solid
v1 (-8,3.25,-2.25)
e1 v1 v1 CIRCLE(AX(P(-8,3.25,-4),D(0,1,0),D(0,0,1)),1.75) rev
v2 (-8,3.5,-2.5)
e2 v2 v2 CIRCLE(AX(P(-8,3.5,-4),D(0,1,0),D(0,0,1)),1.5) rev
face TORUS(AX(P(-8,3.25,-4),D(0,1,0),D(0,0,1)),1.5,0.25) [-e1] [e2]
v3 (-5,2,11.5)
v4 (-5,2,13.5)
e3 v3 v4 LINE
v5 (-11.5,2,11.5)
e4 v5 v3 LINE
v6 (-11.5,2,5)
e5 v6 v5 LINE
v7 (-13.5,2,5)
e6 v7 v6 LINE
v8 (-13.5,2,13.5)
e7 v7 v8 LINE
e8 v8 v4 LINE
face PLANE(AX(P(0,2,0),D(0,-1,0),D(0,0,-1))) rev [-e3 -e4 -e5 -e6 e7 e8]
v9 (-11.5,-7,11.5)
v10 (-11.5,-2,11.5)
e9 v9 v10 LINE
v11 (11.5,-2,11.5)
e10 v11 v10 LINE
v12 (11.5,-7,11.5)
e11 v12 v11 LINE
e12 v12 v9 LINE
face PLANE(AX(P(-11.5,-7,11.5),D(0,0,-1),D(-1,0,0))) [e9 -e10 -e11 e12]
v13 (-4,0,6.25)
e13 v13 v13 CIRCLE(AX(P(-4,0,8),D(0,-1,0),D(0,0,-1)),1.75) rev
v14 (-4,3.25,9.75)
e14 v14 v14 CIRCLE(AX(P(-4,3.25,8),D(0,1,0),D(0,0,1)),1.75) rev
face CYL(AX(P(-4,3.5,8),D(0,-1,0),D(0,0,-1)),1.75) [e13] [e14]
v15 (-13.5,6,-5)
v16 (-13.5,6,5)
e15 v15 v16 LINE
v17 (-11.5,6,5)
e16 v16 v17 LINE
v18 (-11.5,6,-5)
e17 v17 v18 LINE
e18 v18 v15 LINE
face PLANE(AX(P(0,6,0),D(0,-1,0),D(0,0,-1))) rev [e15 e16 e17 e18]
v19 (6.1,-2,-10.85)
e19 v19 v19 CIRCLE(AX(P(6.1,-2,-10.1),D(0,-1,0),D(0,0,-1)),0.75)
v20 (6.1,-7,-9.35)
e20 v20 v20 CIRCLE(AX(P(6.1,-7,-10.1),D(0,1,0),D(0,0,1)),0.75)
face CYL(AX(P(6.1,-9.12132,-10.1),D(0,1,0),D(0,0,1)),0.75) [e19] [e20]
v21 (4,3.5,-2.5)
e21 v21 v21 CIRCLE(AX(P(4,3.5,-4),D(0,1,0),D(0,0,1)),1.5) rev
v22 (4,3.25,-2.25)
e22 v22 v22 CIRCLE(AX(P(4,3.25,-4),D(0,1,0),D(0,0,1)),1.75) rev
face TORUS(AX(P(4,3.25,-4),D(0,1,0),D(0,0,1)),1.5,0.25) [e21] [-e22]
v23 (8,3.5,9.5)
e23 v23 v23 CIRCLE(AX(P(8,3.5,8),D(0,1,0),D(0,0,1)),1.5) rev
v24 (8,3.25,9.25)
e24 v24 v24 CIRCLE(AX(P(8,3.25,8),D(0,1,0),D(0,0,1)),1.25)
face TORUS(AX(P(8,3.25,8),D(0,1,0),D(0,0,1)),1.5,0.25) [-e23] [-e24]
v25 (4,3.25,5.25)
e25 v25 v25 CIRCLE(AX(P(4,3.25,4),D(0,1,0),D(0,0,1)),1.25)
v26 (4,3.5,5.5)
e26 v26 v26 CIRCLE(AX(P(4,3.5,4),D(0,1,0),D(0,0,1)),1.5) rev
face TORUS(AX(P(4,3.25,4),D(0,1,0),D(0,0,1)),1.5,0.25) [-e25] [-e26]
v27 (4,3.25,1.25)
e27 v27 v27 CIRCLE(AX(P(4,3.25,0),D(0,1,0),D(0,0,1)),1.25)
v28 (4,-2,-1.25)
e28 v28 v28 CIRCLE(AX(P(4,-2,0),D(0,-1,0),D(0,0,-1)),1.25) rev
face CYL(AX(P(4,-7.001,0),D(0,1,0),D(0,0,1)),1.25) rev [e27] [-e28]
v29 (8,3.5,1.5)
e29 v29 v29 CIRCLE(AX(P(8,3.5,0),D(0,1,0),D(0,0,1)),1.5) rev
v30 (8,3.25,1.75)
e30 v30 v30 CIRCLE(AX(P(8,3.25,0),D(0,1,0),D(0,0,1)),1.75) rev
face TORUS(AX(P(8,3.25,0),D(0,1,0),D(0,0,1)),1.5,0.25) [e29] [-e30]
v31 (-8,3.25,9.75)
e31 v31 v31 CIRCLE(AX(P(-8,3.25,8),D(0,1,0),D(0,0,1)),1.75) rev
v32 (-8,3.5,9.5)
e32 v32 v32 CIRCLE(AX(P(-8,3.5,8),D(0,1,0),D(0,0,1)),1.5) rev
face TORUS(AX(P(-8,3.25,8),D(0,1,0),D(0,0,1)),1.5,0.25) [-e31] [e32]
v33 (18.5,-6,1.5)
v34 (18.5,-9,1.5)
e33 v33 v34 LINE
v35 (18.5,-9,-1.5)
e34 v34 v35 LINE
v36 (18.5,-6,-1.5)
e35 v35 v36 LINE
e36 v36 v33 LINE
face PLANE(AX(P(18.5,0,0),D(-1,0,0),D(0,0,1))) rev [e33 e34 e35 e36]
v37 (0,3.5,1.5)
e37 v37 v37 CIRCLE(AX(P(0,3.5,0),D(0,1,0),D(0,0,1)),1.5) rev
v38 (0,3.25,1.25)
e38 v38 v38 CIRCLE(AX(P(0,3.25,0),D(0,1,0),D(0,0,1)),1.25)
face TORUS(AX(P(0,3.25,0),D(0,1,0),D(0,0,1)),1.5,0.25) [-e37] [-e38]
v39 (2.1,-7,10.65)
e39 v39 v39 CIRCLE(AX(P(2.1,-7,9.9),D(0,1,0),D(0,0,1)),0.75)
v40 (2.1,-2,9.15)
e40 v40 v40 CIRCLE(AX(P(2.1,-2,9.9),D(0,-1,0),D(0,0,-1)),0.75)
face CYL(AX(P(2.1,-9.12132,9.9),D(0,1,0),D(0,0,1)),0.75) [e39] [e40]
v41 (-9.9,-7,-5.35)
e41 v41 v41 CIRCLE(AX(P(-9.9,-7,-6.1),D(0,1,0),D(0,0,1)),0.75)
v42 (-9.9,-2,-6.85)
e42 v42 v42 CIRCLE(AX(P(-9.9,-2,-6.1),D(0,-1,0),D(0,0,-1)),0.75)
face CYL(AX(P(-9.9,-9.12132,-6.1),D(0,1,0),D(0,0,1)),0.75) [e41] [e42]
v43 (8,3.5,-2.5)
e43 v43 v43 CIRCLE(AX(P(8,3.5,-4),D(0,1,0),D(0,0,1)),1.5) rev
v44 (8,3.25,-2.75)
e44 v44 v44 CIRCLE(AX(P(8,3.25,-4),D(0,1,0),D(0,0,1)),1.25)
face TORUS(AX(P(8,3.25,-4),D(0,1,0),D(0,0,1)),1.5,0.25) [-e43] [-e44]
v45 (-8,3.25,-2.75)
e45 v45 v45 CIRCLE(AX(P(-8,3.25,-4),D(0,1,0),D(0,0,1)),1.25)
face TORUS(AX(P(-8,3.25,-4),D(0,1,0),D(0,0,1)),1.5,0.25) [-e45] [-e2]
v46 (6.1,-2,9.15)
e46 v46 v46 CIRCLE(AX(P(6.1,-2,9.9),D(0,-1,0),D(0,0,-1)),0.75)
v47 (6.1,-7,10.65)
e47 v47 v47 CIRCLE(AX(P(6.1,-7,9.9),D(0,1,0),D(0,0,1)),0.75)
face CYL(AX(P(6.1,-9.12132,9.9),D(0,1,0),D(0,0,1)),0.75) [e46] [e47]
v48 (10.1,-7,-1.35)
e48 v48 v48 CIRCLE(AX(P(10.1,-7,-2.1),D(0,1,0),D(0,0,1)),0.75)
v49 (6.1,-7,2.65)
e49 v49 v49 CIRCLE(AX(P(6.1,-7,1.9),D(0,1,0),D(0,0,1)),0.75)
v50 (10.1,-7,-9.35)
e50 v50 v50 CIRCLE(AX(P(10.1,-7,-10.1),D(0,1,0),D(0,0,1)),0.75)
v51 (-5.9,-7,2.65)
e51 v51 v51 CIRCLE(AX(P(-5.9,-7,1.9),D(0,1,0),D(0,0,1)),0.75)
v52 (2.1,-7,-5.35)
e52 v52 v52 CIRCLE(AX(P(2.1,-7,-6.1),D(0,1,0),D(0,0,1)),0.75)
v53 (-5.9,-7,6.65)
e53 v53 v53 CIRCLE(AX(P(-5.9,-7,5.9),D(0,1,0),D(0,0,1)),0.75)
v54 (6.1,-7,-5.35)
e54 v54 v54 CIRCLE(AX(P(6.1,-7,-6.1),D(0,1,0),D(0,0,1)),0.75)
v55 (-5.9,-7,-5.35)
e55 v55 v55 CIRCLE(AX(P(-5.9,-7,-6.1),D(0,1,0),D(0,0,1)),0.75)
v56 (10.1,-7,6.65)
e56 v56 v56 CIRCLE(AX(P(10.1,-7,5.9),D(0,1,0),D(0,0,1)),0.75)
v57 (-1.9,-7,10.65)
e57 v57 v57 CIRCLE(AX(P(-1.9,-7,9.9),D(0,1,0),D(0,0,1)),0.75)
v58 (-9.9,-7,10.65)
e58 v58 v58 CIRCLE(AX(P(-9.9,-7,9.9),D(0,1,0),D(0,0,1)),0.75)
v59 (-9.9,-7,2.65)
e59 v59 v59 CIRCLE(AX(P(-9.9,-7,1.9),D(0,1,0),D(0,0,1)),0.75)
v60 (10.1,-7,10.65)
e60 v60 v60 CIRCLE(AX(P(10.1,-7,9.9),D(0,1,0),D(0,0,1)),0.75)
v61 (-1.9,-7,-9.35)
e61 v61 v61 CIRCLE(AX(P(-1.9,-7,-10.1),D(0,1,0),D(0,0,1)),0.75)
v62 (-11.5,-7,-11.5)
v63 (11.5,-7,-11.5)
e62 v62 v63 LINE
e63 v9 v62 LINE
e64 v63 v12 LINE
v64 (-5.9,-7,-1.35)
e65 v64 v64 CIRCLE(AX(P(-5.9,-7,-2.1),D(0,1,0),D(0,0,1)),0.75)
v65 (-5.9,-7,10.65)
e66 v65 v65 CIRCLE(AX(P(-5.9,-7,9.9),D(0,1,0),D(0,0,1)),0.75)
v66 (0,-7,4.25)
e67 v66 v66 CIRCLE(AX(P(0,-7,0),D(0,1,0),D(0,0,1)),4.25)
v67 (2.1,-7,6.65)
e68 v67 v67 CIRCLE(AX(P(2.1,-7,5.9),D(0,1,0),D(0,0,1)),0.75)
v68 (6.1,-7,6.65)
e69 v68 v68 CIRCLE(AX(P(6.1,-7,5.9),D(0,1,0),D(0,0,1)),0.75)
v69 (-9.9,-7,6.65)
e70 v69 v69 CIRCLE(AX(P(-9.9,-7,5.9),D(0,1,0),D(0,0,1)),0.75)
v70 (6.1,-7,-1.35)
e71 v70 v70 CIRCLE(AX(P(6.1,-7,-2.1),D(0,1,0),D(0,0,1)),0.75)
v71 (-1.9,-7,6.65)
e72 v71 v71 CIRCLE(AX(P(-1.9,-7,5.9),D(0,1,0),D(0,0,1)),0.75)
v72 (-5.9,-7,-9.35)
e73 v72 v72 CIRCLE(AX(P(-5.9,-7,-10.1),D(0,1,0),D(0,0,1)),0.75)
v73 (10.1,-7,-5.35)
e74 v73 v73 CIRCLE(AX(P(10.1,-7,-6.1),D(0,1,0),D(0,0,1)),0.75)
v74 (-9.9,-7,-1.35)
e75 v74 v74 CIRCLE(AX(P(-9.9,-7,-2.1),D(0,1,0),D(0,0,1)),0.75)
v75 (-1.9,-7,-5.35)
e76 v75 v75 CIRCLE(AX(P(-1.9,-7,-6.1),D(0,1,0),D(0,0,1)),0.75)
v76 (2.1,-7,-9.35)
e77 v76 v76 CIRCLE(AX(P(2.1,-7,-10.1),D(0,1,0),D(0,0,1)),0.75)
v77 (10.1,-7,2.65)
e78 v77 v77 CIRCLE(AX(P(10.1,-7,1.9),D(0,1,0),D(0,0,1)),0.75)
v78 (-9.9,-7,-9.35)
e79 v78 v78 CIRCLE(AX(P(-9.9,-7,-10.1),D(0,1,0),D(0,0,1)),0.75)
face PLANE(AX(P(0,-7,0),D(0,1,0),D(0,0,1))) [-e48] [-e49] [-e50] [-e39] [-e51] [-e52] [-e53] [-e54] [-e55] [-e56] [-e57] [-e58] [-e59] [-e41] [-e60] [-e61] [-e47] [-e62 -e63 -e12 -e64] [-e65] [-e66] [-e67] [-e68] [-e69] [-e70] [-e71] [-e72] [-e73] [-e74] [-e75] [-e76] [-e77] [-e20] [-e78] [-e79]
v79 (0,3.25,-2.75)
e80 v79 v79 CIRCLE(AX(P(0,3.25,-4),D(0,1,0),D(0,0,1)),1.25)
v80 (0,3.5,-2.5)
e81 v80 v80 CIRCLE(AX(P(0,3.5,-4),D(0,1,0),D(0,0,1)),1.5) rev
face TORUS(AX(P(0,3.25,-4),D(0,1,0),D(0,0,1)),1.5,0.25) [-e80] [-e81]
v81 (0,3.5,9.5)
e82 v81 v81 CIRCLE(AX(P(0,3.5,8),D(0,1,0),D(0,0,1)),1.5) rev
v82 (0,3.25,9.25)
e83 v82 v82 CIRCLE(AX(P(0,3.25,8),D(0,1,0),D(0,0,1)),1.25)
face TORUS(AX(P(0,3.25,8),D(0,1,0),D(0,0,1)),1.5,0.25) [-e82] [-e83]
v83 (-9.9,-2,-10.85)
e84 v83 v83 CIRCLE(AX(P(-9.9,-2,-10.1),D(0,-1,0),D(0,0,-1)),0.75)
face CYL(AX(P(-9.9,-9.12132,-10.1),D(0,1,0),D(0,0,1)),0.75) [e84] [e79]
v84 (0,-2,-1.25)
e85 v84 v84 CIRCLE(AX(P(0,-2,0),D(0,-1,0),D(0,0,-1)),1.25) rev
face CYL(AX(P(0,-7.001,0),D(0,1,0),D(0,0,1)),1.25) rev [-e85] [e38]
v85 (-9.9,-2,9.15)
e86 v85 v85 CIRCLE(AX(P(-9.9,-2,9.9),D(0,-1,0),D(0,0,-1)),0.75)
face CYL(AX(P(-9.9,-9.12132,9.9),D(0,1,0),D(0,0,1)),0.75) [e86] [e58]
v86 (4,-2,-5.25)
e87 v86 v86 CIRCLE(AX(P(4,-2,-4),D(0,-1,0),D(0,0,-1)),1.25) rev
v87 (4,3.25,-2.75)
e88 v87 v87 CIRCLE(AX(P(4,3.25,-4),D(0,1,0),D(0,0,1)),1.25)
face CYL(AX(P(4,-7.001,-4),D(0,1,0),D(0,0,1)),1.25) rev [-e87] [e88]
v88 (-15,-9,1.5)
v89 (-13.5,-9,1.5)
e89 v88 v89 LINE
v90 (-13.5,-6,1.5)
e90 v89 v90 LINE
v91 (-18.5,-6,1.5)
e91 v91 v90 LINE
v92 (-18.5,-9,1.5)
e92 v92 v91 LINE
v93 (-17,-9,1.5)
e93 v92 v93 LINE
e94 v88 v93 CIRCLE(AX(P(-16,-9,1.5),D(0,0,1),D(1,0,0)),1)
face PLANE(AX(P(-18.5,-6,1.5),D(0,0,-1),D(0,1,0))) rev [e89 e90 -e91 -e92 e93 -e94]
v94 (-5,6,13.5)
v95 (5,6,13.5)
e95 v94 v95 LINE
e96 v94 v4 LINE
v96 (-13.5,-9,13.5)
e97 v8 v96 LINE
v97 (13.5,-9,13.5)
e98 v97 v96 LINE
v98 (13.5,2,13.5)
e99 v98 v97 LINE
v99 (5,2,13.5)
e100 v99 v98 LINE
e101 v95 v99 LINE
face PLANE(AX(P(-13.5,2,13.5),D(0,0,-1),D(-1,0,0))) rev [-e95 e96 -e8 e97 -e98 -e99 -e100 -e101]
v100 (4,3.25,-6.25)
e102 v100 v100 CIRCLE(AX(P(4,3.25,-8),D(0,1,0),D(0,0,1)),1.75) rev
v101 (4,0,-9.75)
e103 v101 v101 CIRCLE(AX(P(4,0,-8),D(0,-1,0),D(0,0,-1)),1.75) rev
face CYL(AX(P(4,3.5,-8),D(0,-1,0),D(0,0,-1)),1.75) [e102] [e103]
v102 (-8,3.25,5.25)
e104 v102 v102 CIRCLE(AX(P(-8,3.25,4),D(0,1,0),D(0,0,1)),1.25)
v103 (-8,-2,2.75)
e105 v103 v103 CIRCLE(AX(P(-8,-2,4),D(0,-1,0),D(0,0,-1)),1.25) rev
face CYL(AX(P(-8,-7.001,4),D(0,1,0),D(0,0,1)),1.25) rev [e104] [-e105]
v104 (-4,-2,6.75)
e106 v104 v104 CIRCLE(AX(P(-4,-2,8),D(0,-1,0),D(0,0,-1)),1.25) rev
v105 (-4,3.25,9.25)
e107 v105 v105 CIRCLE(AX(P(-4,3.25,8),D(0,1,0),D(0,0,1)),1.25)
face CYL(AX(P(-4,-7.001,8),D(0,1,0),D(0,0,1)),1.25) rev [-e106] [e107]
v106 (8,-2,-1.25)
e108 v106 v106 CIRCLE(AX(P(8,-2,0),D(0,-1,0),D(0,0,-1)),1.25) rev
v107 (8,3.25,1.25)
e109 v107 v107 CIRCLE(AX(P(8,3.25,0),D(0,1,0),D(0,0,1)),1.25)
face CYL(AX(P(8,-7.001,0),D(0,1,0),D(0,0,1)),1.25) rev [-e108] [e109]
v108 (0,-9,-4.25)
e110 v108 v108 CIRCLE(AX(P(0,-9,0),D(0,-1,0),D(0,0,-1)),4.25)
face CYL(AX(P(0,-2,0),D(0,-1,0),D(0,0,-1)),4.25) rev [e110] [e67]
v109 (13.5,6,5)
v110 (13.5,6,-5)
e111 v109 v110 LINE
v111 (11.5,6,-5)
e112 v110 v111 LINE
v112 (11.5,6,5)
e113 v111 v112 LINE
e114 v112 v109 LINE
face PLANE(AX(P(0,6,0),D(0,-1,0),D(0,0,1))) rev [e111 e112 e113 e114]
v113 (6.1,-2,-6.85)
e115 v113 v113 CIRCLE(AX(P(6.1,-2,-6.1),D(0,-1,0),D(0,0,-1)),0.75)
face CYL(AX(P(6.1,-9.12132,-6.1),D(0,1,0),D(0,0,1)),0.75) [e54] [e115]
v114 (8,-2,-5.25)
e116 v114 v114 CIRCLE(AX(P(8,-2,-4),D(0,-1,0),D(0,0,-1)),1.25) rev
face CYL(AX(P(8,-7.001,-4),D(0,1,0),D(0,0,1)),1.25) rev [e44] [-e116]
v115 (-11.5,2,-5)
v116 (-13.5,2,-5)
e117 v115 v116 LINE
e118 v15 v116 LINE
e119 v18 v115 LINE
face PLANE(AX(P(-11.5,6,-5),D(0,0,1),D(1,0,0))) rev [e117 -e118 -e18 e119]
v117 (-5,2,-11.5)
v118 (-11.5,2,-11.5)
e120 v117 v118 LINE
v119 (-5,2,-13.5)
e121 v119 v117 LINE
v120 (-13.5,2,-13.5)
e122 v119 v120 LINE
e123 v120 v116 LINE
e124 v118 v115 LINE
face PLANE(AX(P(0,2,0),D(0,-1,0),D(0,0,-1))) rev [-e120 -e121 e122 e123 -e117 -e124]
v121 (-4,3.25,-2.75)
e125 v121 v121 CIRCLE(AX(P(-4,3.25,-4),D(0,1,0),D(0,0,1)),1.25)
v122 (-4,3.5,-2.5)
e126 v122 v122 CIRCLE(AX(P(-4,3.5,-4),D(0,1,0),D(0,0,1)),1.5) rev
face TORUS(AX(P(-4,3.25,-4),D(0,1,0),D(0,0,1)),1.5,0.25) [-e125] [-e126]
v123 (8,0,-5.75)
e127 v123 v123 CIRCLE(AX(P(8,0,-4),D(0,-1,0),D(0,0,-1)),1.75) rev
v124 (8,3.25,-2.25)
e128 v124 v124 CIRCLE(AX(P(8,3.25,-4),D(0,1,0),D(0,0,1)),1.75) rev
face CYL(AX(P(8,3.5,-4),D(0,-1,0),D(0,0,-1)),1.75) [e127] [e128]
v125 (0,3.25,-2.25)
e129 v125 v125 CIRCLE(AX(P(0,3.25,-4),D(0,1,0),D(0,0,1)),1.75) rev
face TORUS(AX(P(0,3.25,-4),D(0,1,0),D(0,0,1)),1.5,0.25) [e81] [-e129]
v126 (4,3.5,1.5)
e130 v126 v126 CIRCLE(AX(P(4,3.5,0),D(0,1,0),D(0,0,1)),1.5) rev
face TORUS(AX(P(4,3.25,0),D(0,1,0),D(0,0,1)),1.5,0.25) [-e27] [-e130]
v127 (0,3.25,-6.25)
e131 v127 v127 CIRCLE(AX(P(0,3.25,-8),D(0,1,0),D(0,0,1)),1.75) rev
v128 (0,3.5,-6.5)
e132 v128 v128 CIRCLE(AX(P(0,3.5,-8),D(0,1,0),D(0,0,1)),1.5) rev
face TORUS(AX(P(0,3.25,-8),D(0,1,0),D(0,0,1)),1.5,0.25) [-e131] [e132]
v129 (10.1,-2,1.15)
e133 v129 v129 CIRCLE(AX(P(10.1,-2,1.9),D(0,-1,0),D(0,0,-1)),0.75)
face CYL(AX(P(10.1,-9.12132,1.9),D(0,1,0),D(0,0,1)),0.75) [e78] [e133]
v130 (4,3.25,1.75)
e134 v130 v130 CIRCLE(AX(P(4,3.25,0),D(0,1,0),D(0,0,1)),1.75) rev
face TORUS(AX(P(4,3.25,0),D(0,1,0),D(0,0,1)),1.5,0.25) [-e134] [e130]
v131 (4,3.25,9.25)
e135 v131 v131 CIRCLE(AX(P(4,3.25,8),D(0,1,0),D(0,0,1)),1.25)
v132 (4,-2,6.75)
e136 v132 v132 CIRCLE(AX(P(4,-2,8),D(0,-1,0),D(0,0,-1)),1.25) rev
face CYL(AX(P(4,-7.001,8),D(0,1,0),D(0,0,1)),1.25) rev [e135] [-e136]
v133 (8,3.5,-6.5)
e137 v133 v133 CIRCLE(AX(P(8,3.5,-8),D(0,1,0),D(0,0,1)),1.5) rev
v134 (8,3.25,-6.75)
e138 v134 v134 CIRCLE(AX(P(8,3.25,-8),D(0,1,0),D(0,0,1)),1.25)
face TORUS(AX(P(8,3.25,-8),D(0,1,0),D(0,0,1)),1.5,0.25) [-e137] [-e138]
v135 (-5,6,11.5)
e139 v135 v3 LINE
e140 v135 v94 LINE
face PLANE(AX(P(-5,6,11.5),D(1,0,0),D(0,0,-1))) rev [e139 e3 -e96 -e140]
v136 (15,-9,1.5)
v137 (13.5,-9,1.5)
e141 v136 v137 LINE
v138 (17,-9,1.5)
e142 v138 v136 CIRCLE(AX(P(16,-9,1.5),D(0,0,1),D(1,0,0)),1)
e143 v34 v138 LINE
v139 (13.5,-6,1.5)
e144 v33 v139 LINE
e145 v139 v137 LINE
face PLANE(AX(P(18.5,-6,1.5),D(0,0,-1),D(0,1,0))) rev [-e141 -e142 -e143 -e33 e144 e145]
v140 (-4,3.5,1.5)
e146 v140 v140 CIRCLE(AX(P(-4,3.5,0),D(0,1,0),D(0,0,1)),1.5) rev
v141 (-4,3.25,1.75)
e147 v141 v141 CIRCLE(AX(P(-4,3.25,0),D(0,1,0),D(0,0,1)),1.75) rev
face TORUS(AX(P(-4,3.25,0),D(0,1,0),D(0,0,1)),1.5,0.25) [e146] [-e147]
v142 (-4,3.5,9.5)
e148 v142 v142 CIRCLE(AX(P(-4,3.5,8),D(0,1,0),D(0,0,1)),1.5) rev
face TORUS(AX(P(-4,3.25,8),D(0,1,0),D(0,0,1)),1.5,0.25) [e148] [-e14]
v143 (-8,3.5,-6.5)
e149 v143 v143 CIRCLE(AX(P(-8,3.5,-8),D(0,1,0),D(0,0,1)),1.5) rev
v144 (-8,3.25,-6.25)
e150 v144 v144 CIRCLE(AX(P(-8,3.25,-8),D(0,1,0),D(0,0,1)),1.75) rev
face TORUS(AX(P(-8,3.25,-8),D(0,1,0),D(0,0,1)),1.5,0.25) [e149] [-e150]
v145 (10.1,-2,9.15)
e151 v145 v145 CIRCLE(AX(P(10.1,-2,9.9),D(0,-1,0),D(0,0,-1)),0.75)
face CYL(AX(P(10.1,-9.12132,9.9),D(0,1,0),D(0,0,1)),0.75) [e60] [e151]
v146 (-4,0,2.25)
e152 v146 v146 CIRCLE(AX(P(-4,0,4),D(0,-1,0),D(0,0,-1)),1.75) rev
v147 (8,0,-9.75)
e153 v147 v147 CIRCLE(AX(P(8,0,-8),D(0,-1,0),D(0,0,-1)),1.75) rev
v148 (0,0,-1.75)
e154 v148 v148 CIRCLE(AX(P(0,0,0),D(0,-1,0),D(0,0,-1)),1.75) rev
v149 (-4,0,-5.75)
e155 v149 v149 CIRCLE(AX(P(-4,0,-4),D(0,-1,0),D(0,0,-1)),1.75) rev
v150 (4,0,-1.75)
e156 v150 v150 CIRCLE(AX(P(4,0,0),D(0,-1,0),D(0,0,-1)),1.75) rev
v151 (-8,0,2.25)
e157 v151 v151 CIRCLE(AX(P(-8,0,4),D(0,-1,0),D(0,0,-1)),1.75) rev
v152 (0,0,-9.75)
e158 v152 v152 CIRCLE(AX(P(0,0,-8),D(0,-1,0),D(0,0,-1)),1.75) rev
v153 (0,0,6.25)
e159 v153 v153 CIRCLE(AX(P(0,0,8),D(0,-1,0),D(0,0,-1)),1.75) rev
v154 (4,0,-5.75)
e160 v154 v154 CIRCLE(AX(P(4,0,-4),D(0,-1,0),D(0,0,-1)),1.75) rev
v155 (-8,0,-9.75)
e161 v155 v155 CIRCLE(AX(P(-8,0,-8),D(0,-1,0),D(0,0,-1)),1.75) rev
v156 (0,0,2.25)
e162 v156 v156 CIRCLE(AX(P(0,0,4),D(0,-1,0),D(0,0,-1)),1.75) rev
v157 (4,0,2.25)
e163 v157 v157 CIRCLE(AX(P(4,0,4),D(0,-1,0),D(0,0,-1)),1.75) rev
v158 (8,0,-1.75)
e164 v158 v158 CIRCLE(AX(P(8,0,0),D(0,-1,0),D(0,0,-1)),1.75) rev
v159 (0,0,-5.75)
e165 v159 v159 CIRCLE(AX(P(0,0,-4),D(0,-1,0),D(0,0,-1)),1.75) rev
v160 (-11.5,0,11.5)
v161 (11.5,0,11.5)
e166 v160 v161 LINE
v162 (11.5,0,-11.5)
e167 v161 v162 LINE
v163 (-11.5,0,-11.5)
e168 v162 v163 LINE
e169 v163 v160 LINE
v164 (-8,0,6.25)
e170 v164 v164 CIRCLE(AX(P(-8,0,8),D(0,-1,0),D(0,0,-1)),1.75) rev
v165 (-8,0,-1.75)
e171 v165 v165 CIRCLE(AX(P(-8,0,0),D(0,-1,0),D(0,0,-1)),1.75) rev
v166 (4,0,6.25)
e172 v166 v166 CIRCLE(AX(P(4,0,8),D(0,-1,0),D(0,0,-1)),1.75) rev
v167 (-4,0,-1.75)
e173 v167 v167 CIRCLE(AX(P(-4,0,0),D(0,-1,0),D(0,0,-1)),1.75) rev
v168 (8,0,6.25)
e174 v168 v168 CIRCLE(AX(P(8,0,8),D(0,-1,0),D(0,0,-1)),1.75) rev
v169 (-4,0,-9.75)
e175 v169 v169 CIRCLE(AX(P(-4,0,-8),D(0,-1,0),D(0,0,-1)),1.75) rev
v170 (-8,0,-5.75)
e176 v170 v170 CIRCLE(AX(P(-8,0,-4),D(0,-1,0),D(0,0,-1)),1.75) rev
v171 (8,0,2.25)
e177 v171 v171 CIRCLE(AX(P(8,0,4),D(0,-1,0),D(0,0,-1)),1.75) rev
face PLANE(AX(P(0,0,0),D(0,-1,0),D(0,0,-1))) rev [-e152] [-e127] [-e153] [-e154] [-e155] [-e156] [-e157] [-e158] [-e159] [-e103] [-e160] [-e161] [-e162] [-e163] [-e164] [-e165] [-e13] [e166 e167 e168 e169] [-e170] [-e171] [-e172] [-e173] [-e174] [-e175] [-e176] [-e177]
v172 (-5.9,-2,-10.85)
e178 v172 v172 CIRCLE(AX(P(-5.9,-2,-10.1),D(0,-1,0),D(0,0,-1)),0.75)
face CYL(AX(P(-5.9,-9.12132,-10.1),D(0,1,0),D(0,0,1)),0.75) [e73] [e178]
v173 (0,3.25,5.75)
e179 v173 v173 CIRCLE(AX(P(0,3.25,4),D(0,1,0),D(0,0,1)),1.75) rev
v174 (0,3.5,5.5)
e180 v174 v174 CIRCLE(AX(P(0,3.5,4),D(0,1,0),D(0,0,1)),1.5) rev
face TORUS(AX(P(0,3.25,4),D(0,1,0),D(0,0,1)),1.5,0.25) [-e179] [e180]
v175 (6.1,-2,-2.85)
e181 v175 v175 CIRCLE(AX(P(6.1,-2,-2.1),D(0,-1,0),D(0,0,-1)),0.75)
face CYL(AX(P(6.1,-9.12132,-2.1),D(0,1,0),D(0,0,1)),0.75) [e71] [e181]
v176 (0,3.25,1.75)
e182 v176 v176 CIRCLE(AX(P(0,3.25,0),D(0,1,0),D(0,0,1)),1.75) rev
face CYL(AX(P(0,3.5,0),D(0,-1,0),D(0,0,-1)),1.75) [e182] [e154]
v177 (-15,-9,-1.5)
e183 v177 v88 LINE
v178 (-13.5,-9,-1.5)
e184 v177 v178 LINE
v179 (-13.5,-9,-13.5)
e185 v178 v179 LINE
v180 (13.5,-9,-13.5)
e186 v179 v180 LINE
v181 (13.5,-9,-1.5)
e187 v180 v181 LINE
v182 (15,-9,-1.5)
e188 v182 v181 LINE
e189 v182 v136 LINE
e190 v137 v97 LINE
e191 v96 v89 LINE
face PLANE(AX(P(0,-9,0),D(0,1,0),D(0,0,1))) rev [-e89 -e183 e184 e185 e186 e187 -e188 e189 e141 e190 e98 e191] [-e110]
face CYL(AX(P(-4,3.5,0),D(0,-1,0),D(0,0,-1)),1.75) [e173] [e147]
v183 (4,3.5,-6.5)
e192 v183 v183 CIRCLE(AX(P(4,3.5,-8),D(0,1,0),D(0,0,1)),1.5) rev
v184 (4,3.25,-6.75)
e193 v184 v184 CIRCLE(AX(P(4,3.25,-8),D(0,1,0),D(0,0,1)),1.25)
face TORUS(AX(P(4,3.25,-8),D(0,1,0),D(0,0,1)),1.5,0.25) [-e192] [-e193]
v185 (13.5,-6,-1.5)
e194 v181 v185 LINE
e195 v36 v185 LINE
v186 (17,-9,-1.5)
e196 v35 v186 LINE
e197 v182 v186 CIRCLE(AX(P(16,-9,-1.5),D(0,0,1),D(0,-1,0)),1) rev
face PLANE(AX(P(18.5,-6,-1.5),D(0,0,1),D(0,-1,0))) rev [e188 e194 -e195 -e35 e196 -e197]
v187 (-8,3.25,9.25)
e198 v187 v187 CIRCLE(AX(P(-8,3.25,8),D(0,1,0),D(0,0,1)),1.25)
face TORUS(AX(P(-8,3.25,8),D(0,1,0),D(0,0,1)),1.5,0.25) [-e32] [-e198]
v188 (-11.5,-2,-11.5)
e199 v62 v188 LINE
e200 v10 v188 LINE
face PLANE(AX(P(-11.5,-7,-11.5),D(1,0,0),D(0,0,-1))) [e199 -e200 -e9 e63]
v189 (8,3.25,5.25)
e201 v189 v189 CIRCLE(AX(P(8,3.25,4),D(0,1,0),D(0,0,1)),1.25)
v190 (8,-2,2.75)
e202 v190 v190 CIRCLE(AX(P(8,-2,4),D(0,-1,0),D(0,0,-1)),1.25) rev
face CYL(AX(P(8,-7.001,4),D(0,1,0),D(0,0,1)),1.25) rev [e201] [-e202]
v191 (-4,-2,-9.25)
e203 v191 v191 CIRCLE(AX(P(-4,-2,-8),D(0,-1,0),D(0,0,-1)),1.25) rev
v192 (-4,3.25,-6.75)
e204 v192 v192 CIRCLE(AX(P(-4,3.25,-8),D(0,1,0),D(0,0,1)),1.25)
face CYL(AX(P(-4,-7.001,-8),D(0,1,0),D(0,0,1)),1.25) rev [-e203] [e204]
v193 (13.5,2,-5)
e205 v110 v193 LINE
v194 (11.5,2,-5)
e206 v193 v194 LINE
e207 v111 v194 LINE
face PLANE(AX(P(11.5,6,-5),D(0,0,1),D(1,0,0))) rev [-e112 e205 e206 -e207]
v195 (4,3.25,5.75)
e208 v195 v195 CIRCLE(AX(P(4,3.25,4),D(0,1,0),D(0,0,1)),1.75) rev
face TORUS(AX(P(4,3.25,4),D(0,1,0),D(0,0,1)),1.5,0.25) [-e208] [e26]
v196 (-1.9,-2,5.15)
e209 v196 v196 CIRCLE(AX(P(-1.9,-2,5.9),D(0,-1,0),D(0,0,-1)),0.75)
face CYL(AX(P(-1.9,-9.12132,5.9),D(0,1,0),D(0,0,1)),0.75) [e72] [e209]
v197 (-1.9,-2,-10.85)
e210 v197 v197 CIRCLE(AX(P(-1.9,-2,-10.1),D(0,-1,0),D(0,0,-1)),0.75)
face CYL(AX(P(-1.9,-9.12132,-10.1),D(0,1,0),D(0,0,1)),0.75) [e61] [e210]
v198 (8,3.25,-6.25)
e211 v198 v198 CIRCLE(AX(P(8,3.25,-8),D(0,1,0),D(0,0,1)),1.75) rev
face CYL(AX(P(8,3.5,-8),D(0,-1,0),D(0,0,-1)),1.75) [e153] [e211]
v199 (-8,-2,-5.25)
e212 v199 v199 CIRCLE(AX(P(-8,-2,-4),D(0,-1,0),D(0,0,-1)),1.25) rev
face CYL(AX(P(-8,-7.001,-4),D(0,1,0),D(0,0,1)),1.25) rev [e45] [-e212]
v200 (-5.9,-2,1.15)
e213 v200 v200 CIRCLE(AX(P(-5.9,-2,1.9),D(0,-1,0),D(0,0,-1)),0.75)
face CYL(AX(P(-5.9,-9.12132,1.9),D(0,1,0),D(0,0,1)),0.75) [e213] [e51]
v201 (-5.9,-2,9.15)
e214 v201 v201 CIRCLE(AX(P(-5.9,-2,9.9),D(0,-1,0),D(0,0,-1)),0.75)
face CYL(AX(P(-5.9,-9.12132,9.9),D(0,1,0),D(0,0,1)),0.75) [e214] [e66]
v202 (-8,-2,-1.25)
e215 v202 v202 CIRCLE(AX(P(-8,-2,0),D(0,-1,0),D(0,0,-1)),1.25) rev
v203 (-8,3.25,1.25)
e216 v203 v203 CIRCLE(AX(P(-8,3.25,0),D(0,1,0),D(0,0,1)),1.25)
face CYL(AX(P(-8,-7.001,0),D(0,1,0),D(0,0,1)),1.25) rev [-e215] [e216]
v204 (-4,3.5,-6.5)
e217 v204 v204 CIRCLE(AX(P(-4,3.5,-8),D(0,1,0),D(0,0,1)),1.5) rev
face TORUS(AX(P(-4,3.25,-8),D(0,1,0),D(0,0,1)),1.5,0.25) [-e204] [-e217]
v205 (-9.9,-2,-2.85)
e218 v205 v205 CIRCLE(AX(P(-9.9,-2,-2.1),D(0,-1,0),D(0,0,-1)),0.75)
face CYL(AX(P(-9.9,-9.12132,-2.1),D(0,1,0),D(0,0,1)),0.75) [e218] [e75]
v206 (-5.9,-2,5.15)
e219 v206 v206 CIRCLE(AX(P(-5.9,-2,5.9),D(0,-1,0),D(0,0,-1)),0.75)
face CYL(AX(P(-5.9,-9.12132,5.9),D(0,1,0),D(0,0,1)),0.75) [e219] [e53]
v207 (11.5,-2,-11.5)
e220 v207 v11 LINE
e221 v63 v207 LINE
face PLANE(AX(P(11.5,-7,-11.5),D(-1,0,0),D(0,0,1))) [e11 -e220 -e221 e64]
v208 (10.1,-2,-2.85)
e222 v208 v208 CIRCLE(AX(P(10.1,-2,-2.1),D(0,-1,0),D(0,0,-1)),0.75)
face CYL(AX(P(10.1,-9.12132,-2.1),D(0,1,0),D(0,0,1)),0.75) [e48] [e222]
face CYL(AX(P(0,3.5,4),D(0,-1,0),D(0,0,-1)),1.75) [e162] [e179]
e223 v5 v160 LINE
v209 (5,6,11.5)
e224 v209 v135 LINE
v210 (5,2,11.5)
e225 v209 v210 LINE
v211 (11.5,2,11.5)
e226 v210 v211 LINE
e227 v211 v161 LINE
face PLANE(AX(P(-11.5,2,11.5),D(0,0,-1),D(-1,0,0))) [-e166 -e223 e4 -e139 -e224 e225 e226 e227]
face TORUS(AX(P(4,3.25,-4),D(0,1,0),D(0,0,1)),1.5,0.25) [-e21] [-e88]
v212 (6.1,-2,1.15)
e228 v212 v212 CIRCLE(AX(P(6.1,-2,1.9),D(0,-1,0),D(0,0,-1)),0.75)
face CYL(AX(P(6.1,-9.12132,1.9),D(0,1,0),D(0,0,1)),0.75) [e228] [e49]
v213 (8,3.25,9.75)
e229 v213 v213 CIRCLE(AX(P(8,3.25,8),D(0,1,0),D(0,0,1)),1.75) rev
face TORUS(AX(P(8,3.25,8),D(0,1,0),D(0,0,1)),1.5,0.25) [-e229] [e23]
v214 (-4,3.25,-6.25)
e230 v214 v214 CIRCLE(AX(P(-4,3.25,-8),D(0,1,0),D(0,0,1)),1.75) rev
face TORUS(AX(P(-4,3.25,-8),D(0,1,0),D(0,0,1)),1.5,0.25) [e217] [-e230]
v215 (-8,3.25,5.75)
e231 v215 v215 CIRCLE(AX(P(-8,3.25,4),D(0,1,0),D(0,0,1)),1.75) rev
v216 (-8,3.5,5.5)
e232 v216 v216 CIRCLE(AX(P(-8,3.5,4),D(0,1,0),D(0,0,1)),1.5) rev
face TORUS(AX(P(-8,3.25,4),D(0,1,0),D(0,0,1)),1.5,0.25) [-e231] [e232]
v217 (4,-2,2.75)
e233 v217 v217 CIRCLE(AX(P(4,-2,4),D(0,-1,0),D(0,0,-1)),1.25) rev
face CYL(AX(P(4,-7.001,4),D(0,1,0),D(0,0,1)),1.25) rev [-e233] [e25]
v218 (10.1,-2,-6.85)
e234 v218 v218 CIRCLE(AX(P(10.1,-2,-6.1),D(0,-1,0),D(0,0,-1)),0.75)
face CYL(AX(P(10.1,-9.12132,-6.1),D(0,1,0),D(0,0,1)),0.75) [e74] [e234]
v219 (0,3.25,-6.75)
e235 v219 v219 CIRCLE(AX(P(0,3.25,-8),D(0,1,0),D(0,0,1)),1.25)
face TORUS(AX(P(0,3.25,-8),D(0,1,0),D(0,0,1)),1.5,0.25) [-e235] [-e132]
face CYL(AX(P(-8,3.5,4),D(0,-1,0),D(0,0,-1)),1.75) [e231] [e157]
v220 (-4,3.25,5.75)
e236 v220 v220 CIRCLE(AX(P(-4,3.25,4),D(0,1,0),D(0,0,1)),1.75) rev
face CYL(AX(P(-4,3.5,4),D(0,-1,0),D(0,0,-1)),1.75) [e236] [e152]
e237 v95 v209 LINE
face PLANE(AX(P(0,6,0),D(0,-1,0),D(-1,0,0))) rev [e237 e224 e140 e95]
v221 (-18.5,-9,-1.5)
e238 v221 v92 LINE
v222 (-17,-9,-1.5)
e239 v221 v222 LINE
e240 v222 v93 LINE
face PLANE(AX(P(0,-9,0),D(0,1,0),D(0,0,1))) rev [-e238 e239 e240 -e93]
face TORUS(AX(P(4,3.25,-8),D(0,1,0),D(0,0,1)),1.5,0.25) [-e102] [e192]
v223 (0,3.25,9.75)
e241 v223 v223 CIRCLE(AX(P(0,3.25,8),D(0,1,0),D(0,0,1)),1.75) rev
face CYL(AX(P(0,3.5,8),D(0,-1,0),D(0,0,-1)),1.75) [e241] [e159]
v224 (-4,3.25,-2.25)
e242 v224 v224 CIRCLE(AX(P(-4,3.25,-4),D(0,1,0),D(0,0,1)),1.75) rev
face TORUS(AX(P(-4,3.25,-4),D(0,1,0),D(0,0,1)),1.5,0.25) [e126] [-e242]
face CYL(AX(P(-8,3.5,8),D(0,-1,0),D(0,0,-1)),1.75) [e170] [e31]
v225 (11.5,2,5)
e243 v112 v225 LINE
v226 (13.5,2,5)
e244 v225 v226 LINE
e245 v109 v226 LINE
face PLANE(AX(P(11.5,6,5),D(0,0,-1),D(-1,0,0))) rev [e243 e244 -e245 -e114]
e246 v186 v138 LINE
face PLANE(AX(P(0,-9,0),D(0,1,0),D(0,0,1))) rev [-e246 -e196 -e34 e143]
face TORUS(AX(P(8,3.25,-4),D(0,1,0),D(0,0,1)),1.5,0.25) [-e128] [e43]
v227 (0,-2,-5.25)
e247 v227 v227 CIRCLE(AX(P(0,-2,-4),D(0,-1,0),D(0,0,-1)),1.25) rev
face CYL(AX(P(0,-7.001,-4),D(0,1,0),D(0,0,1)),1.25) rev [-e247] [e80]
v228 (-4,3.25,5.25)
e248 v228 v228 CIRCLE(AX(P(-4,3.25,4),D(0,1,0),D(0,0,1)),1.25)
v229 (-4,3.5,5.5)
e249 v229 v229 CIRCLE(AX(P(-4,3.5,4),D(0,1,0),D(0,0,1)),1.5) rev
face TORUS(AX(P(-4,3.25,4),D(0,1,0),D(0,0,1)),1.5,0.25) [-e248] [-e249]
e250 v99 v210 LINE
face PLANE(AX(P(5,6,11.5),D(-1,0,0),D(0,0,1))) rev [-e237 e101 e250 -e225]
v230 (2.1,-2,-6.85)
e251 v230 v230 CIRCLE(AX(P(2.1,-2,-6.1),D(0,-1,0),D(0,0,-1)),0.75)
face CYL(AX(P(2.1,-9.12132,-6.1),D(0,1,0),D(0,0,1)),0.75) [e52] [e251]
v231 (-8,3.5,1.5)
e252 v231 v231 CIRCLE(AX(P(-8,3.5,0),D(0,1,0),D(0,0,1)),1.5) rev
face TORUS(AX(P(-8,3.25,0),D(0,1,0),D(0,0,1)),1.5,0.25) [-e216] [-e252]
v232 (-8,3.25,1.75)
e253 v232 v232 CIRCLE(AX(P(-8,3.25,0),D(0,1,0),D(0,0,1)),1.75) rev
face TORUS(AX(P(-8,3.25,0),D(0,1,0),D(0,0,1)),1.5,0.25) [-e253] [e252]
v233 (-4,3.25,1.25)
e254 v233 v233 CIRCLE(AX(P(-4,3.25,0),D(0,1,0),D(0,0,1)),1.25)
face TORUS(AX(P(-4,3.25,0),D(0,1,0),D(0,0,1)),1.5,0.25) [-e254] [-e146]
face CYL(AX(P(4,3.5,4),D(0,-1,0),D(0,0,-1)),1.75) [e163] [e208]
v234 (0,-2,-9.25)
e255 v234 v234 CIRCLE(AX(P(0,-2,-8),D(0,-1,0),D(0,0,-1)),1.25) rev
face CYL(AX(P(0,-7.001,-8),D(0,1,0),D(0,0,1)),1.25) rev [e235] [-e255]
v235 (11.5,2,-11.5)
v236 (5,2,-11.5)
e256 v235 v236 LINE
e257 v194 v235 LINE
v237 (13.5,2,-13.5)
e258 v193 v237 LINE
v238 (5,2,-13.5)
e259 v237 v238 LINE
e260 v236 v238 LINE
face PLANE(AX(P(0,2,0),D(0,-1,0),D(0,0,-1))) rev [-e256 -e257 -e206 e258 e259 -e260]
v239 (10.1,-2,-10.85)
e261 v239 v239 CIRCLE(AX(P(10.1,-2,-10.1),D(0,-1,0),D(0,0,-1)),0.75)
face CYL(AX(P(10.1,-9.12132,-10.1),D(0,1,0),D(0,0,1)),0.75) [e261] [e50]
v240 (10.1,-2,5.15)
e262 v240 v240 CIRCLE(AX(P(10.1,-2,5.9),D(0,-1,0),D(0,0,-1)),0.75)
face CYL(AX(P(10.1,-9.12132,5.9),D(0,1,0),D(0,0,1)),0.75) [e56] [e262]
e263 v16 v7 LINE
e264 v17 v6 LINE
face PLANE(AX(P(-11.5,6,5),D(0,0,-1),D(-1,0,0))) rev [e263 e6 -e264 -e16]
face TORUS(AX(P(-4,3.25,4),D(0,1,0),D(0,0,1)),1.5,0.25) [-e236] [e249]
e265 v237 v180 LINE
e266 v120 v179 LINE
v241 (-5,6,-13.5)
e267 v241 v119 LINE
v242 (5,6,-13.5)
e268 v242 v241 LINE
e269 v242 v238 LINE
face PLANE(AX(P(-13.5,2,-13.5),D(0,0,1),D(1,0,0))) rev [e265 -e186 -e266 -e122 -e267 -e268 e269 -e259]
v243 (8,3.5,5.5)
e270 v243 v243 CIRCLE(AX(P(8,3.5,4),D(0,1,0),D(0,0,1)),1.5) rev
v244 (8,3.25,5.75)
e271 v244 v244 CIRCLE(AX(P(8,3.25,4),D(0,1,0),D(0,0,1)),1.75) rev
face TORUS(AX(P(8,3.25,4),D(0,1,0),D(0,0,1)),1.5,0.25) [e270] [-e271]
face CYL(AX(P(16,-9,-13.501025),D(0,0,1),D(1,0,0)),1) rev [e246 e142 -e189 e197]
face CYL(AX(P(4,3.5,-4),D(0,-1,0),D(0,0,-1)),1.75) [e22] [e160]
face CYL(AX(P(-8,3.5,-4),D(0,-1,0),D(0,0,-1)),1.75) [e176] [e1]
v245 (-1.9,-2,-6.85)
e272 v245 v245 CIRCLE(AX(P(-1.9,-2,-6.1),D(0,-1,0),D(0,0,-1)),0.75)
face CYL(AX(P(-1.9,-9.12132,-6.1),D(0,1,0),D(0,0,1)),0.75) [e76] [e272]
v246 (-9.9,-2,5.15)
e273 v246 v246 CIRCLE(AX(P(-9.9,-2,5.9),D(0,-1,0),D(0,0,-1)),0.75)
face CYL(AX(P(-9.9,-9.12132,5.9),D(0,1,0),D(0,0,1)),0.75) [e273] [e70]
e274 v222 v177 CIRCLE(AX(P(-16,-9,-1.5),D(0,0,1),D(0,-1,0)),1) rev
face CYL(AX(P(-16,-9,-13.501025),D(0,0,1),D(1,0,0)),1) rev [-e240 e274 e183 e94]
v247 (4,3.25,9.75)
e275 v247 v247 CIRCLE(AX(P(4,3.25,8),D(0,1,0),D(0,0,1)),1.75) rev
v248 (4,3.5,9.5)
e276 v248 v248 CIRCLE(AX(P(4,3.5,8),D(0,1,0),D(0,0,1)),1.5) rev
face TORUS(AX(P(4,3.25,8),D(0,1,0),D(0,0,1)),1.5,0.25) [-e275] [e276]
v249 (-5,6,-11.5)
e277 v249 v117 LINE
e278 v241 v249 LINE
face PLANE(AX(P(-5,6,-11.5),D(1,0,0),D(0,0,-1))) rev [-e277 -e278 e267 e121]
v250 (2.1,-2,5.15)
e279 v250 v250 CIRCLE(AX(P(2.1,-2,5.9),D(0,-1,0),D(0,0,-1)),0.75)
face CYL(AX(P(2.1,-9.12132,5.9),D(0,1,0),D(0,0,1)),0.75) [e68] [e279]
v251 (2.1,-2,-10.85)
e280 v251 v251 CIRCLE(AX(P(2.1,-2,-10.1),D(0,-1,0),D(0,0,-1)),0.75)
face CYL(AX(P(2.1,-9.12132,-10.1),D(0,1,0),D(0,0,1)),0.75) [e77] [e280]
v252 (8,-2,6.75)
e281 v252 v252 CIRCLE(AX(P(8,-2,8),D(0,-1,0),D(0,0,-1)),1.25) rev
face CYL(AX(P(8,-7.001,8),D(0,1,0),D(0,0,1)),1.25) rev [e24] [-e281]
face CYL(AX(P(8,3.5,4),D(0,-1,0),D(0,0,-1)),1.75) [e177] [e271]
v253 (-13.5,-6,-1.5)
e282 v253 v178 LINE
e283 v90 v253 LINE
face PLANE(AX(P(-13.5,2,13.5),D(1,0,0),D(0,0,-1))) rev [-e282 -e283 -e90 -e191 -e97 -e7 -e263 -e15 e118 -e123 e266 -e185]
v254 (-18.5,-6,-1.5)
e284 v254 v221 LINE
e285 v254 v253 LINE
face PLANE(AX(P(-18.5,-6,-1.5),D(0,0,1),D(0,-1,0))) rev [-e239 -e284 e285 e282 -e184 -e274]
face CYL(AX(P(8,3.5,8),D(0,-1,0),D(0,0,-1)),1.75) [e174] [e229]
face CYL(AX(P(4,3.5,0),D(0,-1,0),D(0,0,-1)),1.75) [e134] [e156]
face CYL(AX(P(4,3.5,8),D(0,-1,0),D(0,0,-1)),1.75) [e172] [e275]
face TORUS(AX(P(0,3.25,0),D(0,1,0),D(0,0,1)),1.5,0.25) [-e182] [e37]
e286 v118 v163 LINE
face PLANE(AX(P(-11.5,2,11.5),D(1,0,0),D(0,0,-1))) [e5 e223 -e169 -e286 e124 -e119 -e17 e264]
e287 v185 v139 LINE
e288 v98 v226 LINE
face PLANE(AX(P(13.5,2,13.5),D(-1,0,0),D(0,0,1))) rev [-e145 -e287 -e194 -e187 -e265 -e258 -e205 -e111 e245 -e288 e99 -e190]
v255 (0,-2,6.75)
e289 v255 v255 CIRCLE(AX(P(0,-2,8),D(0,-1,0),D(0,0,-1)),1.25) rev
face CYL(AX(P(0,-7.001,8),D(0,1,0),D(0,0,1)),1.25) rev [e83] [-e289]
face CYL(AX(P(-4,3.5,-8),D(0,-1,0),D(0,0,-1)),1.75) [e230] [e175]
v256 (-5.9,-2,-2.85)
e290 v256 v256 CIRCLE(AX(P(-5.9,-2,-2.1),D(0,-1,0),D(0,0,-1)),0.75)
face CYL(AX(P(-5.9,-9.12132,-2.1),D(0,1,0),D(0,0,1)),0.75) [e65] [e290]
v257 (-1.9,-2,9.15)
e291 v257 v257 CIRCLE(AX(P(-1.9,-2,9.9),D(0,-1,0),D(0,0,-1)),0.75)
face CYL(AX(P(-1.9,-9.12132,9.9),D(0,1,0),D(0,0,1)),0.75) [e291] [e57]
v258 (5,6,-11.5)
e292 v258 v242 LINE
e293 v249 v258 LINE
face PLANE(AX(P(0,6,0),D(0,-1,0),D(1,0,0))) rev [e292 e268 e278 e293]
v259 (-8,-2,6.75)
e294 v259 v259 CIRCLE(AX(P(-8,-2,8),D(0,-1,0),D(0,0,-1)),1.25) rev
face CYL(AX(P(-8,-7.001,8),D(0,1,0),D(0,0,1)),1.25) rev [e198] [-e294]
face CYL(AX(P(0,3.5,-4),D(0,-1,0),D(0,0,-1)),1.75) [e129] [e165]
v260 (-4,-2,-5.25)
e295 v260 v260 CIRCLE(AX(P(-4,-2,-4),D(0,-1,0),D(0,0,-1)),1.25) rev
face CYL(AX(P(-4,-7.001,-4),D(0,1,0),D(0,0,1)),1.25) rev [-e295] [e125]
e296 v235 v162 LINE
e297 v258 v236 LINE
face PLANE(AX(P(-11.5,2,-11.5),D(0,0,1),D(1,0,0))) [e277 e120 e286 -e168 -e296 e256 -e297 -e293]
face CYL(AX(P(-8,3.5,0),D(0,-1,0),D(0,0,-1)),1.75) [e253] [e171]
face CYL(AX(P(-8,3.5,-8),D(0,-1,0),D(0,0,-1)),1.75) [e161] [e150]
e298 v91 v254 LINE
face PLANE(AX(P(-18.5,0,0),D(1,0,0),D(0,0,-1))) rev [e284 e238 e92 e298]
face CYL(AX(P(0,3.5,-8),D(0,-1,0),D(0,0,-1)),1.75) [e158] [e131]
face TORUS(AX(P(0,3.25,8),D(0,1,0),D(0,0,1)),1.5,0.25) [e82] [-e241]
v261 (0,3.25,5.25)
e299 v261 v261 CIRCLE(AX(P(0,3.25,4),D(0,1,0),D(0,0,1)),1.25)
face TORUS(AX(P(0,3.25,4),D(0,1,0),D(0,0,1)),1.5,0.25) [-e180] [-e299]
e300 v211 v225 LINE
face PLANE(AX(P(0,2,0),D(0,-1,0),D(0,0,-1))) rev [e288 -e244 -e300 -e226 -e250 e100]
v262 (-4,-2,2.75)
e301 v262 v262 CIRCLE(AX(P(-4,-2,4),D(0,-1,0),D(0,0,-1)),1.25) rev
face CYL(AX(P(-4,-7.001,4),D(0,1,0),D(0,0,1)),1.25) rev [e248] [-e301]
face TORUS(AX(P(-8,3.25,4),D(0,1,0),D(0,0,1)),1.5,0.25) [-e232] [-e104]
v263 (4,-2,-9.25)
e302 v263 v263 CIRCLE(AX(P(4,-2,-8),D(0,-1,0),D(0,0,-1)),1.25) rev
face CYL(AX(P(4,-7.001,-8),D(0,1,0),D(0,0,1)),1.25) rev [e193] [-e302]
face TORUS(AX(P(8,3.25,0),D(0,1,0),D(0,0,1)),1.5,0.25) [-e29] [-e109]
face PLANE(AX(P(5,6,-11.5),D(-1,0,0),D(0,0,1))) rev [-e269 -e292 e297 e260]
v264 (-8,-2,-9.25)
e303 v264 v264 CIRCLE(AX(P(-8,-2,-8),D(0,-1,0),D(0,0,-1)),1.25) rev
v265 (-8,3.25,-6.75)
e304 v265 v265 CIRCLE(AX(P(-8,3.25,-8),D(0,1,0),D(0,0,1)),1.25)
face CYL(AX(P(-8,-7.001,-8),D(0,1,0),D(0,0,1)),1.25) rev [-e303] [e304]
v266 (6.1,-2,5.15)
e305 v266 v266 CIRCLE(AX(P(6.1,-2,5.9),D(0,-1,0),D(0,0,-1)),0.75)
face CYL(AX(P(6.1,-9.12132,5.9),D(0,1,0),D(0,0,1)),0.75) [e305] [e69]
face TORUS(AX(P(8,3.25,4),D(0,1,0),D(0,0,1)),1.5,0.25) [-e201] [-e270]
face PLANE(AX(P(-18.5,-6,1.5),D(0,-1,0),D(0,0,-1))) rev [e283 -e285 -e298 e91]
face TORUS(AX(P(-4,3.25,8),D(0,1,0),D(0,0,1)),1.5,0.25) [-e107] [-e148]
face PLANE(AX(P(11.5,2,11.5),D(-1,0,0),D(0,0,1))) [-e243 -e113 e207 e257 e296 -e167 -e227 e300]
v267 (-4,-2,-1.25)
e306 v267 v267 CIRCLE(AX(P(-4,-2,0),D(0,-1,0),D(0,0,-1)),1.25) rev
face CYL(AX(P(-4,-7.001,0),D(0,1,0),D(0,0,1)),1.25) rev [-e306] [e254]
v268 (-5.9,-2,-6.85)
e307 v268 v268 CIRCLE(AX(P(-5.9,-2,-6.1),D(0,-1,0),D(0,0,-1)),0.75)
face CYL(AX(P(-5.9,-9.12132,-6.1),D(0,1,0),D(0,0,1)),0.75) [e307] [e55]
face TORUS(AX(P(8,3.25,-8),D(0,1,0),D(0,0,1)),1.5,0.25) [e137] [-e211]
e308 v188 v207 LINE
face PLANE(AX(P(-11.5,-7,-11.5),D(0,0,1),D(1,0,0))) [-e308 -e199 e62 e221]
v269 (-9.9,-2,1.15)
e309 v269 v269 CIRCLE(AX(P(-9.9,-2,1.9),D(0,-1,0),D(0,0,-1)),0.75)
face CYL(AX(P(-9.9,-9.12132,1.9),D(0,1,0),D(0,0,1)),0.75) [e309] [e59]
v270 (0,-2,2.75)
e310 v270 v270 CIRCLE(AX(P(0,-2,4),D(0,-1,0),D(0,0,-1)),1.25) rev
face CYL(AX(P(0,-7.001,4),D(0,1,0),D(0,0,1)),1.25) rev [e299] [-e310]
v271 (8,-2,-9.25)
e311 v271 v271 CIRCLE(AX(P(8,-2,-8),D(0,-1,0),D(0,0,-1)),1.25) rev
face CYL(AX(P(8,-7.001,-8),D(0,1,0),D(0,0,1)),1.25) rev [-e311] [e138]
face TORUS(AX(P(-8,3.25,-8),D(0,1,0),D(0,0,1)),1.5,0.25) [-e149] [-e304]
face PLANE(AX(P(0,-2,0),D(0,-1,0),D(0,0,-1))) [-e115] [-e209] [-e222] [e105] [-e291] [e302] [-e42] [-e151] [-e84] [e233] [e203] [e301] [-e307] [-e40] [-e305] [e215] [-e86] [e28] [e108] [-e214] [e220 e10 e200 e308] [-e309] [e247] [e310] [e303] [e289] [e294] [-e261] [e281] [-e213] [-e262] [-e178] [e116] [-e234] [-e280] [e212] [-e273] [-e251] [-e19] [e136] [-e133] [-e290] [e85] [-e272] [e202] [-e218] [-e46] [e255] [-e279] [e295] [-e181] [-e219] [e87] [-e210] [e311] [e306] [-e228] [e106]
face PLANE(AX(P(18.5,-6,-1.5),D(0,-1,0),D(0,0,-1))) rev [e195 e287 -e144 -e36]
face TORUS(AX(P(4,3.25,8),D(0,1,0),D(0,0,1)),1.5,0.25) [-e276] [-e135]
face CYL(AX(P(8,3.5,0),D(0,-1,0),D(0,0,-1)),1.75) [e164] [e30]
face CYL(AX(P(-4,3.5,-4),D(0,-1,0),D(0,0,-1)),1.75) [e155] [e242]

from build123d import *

# Parameters (mm, degrees)
SKETCH1_W              = 27
SKETCH1_H              = 27
SKETCH1_W_2            = 23
SKETCH1_H_2            = 23
BOSS_EXTRUDE1_DEPTH    = 2
SKETCH2_W              = 27
SKETCH2_H              = 27
BOSS_EXTRUDE2_DEPTH    = 2
SKETCH3_W              = 27
SKETCH3_H              = 27
SKETCH3_W_2            = 23
SKETCH3_H_2            = 23
BOSS_EXTRUDE3_DEPTH    = 5
SKETCH6_R              = 1.75
BOSS_EXTRUDE5_DEPTH    = 3.5
CUT_EXTRUDE2_REACH     = 23.789
SKETCH7_R              = 1.25
FILLET1_R              = 0.25
LPATTERN3_COUNT        = 5
LPATTERN3_PITCH        = 4
LPATTERN3_COUNT_DIR2   = 5
LPATTERN3_PITCH_DIR2   = 4
FILLET1_OF_LPATTERN3_R = 0.25
SKETCH11_R             = 0.75
BOSS_EXTRUDE8_DEPTH    = 5
LPATTERN2_COUNT        = 6
LPATTERN2_PITCH        = 4
LPATTERN2_COUNT_DIR2   = 6
LPATTERN2_PITCH_DIR2   = 4
SKETCH8_W              = 27
SKETCH8_H              = 27
BOSS_EXTRUDE6_DEPTH    = 2
SKETCH9_R              = 4.25
CUT_EXTRUDE3_DEPTH     = 7
SKETCH10_W             = 2
SKETCH10_H             = 10
BOSS_EXTRUDE7_DEPTH    = 4
CIRPATTERN2_COUNT      = 4
SKETCH12_W             = 3
SKETCH12_H             = 3
BOSS_EXTRUDE9_DEPTH    = 5
CIRPATTERN1_COUNT      = 2
CUT_EXTRUDE4_REACH     = 27.461


with BuildPart() as part:
    # Sketch1 → Boss-Extrude1 (new body)
    with BuildSketch(Plane(origin=(0, 0, 0), x_dir=(1, 0, 0), z_dir=(0, 1, 0))):
        Rectangle(SKETCH1_W, SKETCH1_H)
        Rectangle(SKETCH1_W_2, SKETCH1_H_2, mode=Mode.SUBTRACT)
    extrude(amount=BOSS_EXTRUDE1_DEPTH)

    # Sketch2 → Boss-Extrude2 (add)
    with BuildSketch(Plane.XZ):
        Rectangle(SKETCH2_W, SKETCH2_H)
    extrude(amount=BOSS_EXTRUDE2_DEPTH)

    # Sketch3 → Boss-Extrude3 (add)
    with BuildSketch(Plane.XZ.offset(2)):
        Rectangle(SKETCH3_W, SKETCH3_H)
        Rectangle(SKETCH3_W_2, SKETCH3_H_2, mode=Mode.SUBTRACT)
    extrude(amount=BOSS_EXTRUDE3_DEPTH)

    # Sketch6 → Boss-Extrude5 (add)
    with BuildSketch(Plane(origin=(0, 0, 0), x_dir=(1, 0, 0), z_dir=(0, 1, 0))):
        with Locations(Location((8, 8, 0), (0, 0, 90))):
            Circle(SKETCH6_R)
    boss_extrude5 = extrude(amount=BOSS_EXTRUDE5_DEPTH)

    # Sketch7 → Cut-Extrude2 (cut, up to next)
    with BuildSketch(Plane(origin=(0, 3.5, 0), x_dir=(1, 0, 0), z_dir=(0, 1, 0)), mode=Mode.PRIVATE) as cut_extrude2_sk1:
        with Locations(Location((8, 8, 0), (0, 0, 270))):
            Circle(SKETCH7_R)
    cut_extrude2_tool1 = extrude(cut_extrude2_sk1.sketch, amount=-CUT_EXTRUDE2_REACH, mode=Mode.PRIVATE) & part.part
    cut_extrude2 = cut_extrude2_tool1.solids().sort_by_distance((8, 3.5, -8))[0]
    add(cut_extrude2, mode=Mode.SUBTRACT)

    # Fillet1
    fillet1_edges = [part.edges().sort_by_distance(p)[0] for p in [
        (8, 3.5, -6.25),
        (8, 3.5, -9.25),
    ]]
    fillet(fillet1_edges, radius=FILLET1_R - 0.0001)  # a hair under: the kernel refuses the full size

    # LPattern3: Boss-Extrude5, Cut-Extrude2 5 × 5
    with Locations(*[(-j * LPATTERN3_PITCH_DIR2, 0, i * LPATTERN3_PITCH) for i in range(LPATTERN3_COUNT) for j in range(LPATTERN3_COUNT_DIR2) if (i, j) != (0, 0)]):
        add(boss_extrude5)
        add(cut_extrude2, mode=Mode.SUBTRACT)

    # Fillet1 of LPattern3
    fillet1_of_lpattern3_edges = [part.edges().sort_by_distance(p)[0] for p in [
        (4, 3.5, -6.25),
        (4, 3.5, -9.25),
        (0, 3.5, -6.25),
        (0, 3.5, -9.25),
        (-4, 3.5, -6.25),
        (-4, 3.5, -9.25),
        (-8, 3.5, -6.25),
        (-8, 3.5, -9.25),
        (8, 3.5, -2.25),
        (8, 3.5, -5.25),
        (4, 3.5, -2.25),
        (4, 3.5, -5.25),
        (0, 3.5, -2.25),
        (0, 3.5, -5.25),
        (-4, 3.5, -2.25),
        (-4, 3.5, -5.25),
        (-8, 3.5, -2.25),
        (-8, 3.5, -5.25),
        (8, 3.5, 1.75),
        (8, 3.5, -1.25),
        (4, 3.5, 1.75),
        (4, 3.5, -1.25),
        (0, 3.5, 1.75),
        (0, 3.5, -1.25),
        (-4, 3.5, 1.75),
        (-4, 3.5, -1.25),
        (-8, 3.5, 1.75),
        (-8, 3.5, -1.25),
        (8, 3.5, 5.75),
        (8, 3.5, 2.75),
        (4, 3.5, 5.75),
        (4, 3.5, 2.75),
        (0, 3.5, 5.75),
        (0, 3.5, 2.75),
        (-4, 3.5, 5.75),
        (-4, 3.5, 2.75),
        (-8, 3.5, 5.75),
        (-8, 3.5, 2.75),
        (8, 3.5, 9.75),
        (8, 3.5, 6.75),
        (4, 3.5, 9.75),
        (4, 3.5, 6.75),
        (0, 3.5, 9.75),
        (0, 3.5, 6.75),
        (-4, 3.5, 9.75),
        (-4, 3.5, 6.75),
        (-8, 3.5, 9.75),
        (-8, 3.5, 6.75),
    ]]
    fillet(fillet1_of_lpattern3_edges, radius=FILLET1_OF_LPATTERN3_R - 0.0001)  # a hair under: the kernel refuses the full size

    # Sketch11 → Boss-Extrude8 (add)
    with BuildSketch(Plane.XZ.offset(2)):
        with Locations(Location((-9.9, 9.9, 0), (0, 0, 90))):
            Circle(SKETCH11_R)
    boss_extrude8 = extrude(amount=BOSS_EXTRUDE8_DEPTH)

    # LPattern2: Boss-Extrude8 6 × 6
    with Locations(*[(i * LPATTERN2_PITCH, 0, -j * LPATTERN2_PITCH_DIR2) for i in range(LPATTERN2_COUNT) for j in range(LPATTERN2_COUNT_DIR2) if (i, j) != (0, 0)]):
        add(boss_extrude8)

    # Sketch8 → Boss-Extrude6 (add)
    with BuildSketch(Plane.XZ.offset(7)):
        Rectangle(SKETCH8_W, SKETCH8_H)
    extrude(amount=BOSS_EXTRUDE6_DEPTH)

    # Sketch9 → Cut-Extrude3 (cut)
    with BuildSketch(Plane.XZ.offset(9)):
        with Locations(Location((0, 0, 0), (0, 0, 270))):
            Circle(SKETCH9_R)
    extrude(amount=-CUT_EXTRUDE3_DEPTH, mode=Mode.SUBTRACT)

    # Sketch10 → Boss-Extrude7 (add)
    with BuildSketch(Plane(origin=(0, 2, 0), x_dir=(1, 0, 0), z_dir=(0, 1, 0))):
        with Locations((-12.5, 0)):
            Rectangle(SKETCH10_W, SKETCH10_H)
    boss_extrude7 = extrude(amount=BOSS_EXTRUDE7_DEPTH)

    # CirPattern2: Boss-Extrude7 ×4 about axis
    cirpattern2_axis = Axis((0, 0, 0), (0, 1, 0))
    for i in range(1, CIRPATTERN2_COUNT):
        add(boss_extrude7.rotate(cirpattern2_axis, i * 360 / CIRPATTERN2_COUNT))

    # Sketch12 → Boss-Extrude9 (add)
    with BuildSketch(Plane.ZY.offset(13.5)):
        with Locations((0, -7.5)):
            Rectangle(SKETCH12_W, SKETCH12_H)
    boss_extrude9 = extrude(amount=BOSS_EXTRUDE9_DEPTH)

    # CirPattern1: Boss-Extrude9 ×2 about axis
    cirpattern1_axis = Axis((0, 0, 0), (0, 1, 0))
    for i in range(1, CIRPATTERN1_COUNT):
        add(boss_extrude9.rotate(cirpattern1_axis, i * 360 / CIRPATTERN1_COUNT))

    # Sketch13 → Cut-Extrude4 (cut, up to next)
    with BuildSketch(Plane.XY.offset(1.5), mode=Mode.PRIVATE) as cut_extrude4_sk1:
        with BuildLine():
            Line((15, -9), (17, -9))
            ThreePointArc((17, -9), (16, -8), (15, -9))
        make_face()
    cut_extrude4_tool1 = extrude(cut_extrude4_sk1.sketch, amount=-CUT_EXTRUDE4_REACH, mode=Mode.PRIVATE) & part.part
    # Sketch13 → Cut-Extrude4 (cut, up to next)
    with BuildSketch(Plane.XY.offset(1.5), mode=Mode.PRIVATE) as cut_extrude4_sk2:
        with BuildLine():
            Line((-17, -9), (-15, -9))
            ThreePointArc((-15, -9), (-16, -8), (-17, -9))
        make_face()
    cut_extrude4_tool2 = extrude(cut_extrude4_sk2.sketch, amount=-CUT_EXTRUDE4_REACH, mode=Mode.PRIVATE) & part.part
    add(cut_extrude4_tool1.solids().sort_by_distance((16, -8.575587, 1.5))[0], mode=Mode.SUBTRACT)
    add(cut_extrude4_tool2.solids().sort_by_distance((-16, -8.575587, 1.5))[0], mode=Mode.SUBTRACT)


solid = part.part
